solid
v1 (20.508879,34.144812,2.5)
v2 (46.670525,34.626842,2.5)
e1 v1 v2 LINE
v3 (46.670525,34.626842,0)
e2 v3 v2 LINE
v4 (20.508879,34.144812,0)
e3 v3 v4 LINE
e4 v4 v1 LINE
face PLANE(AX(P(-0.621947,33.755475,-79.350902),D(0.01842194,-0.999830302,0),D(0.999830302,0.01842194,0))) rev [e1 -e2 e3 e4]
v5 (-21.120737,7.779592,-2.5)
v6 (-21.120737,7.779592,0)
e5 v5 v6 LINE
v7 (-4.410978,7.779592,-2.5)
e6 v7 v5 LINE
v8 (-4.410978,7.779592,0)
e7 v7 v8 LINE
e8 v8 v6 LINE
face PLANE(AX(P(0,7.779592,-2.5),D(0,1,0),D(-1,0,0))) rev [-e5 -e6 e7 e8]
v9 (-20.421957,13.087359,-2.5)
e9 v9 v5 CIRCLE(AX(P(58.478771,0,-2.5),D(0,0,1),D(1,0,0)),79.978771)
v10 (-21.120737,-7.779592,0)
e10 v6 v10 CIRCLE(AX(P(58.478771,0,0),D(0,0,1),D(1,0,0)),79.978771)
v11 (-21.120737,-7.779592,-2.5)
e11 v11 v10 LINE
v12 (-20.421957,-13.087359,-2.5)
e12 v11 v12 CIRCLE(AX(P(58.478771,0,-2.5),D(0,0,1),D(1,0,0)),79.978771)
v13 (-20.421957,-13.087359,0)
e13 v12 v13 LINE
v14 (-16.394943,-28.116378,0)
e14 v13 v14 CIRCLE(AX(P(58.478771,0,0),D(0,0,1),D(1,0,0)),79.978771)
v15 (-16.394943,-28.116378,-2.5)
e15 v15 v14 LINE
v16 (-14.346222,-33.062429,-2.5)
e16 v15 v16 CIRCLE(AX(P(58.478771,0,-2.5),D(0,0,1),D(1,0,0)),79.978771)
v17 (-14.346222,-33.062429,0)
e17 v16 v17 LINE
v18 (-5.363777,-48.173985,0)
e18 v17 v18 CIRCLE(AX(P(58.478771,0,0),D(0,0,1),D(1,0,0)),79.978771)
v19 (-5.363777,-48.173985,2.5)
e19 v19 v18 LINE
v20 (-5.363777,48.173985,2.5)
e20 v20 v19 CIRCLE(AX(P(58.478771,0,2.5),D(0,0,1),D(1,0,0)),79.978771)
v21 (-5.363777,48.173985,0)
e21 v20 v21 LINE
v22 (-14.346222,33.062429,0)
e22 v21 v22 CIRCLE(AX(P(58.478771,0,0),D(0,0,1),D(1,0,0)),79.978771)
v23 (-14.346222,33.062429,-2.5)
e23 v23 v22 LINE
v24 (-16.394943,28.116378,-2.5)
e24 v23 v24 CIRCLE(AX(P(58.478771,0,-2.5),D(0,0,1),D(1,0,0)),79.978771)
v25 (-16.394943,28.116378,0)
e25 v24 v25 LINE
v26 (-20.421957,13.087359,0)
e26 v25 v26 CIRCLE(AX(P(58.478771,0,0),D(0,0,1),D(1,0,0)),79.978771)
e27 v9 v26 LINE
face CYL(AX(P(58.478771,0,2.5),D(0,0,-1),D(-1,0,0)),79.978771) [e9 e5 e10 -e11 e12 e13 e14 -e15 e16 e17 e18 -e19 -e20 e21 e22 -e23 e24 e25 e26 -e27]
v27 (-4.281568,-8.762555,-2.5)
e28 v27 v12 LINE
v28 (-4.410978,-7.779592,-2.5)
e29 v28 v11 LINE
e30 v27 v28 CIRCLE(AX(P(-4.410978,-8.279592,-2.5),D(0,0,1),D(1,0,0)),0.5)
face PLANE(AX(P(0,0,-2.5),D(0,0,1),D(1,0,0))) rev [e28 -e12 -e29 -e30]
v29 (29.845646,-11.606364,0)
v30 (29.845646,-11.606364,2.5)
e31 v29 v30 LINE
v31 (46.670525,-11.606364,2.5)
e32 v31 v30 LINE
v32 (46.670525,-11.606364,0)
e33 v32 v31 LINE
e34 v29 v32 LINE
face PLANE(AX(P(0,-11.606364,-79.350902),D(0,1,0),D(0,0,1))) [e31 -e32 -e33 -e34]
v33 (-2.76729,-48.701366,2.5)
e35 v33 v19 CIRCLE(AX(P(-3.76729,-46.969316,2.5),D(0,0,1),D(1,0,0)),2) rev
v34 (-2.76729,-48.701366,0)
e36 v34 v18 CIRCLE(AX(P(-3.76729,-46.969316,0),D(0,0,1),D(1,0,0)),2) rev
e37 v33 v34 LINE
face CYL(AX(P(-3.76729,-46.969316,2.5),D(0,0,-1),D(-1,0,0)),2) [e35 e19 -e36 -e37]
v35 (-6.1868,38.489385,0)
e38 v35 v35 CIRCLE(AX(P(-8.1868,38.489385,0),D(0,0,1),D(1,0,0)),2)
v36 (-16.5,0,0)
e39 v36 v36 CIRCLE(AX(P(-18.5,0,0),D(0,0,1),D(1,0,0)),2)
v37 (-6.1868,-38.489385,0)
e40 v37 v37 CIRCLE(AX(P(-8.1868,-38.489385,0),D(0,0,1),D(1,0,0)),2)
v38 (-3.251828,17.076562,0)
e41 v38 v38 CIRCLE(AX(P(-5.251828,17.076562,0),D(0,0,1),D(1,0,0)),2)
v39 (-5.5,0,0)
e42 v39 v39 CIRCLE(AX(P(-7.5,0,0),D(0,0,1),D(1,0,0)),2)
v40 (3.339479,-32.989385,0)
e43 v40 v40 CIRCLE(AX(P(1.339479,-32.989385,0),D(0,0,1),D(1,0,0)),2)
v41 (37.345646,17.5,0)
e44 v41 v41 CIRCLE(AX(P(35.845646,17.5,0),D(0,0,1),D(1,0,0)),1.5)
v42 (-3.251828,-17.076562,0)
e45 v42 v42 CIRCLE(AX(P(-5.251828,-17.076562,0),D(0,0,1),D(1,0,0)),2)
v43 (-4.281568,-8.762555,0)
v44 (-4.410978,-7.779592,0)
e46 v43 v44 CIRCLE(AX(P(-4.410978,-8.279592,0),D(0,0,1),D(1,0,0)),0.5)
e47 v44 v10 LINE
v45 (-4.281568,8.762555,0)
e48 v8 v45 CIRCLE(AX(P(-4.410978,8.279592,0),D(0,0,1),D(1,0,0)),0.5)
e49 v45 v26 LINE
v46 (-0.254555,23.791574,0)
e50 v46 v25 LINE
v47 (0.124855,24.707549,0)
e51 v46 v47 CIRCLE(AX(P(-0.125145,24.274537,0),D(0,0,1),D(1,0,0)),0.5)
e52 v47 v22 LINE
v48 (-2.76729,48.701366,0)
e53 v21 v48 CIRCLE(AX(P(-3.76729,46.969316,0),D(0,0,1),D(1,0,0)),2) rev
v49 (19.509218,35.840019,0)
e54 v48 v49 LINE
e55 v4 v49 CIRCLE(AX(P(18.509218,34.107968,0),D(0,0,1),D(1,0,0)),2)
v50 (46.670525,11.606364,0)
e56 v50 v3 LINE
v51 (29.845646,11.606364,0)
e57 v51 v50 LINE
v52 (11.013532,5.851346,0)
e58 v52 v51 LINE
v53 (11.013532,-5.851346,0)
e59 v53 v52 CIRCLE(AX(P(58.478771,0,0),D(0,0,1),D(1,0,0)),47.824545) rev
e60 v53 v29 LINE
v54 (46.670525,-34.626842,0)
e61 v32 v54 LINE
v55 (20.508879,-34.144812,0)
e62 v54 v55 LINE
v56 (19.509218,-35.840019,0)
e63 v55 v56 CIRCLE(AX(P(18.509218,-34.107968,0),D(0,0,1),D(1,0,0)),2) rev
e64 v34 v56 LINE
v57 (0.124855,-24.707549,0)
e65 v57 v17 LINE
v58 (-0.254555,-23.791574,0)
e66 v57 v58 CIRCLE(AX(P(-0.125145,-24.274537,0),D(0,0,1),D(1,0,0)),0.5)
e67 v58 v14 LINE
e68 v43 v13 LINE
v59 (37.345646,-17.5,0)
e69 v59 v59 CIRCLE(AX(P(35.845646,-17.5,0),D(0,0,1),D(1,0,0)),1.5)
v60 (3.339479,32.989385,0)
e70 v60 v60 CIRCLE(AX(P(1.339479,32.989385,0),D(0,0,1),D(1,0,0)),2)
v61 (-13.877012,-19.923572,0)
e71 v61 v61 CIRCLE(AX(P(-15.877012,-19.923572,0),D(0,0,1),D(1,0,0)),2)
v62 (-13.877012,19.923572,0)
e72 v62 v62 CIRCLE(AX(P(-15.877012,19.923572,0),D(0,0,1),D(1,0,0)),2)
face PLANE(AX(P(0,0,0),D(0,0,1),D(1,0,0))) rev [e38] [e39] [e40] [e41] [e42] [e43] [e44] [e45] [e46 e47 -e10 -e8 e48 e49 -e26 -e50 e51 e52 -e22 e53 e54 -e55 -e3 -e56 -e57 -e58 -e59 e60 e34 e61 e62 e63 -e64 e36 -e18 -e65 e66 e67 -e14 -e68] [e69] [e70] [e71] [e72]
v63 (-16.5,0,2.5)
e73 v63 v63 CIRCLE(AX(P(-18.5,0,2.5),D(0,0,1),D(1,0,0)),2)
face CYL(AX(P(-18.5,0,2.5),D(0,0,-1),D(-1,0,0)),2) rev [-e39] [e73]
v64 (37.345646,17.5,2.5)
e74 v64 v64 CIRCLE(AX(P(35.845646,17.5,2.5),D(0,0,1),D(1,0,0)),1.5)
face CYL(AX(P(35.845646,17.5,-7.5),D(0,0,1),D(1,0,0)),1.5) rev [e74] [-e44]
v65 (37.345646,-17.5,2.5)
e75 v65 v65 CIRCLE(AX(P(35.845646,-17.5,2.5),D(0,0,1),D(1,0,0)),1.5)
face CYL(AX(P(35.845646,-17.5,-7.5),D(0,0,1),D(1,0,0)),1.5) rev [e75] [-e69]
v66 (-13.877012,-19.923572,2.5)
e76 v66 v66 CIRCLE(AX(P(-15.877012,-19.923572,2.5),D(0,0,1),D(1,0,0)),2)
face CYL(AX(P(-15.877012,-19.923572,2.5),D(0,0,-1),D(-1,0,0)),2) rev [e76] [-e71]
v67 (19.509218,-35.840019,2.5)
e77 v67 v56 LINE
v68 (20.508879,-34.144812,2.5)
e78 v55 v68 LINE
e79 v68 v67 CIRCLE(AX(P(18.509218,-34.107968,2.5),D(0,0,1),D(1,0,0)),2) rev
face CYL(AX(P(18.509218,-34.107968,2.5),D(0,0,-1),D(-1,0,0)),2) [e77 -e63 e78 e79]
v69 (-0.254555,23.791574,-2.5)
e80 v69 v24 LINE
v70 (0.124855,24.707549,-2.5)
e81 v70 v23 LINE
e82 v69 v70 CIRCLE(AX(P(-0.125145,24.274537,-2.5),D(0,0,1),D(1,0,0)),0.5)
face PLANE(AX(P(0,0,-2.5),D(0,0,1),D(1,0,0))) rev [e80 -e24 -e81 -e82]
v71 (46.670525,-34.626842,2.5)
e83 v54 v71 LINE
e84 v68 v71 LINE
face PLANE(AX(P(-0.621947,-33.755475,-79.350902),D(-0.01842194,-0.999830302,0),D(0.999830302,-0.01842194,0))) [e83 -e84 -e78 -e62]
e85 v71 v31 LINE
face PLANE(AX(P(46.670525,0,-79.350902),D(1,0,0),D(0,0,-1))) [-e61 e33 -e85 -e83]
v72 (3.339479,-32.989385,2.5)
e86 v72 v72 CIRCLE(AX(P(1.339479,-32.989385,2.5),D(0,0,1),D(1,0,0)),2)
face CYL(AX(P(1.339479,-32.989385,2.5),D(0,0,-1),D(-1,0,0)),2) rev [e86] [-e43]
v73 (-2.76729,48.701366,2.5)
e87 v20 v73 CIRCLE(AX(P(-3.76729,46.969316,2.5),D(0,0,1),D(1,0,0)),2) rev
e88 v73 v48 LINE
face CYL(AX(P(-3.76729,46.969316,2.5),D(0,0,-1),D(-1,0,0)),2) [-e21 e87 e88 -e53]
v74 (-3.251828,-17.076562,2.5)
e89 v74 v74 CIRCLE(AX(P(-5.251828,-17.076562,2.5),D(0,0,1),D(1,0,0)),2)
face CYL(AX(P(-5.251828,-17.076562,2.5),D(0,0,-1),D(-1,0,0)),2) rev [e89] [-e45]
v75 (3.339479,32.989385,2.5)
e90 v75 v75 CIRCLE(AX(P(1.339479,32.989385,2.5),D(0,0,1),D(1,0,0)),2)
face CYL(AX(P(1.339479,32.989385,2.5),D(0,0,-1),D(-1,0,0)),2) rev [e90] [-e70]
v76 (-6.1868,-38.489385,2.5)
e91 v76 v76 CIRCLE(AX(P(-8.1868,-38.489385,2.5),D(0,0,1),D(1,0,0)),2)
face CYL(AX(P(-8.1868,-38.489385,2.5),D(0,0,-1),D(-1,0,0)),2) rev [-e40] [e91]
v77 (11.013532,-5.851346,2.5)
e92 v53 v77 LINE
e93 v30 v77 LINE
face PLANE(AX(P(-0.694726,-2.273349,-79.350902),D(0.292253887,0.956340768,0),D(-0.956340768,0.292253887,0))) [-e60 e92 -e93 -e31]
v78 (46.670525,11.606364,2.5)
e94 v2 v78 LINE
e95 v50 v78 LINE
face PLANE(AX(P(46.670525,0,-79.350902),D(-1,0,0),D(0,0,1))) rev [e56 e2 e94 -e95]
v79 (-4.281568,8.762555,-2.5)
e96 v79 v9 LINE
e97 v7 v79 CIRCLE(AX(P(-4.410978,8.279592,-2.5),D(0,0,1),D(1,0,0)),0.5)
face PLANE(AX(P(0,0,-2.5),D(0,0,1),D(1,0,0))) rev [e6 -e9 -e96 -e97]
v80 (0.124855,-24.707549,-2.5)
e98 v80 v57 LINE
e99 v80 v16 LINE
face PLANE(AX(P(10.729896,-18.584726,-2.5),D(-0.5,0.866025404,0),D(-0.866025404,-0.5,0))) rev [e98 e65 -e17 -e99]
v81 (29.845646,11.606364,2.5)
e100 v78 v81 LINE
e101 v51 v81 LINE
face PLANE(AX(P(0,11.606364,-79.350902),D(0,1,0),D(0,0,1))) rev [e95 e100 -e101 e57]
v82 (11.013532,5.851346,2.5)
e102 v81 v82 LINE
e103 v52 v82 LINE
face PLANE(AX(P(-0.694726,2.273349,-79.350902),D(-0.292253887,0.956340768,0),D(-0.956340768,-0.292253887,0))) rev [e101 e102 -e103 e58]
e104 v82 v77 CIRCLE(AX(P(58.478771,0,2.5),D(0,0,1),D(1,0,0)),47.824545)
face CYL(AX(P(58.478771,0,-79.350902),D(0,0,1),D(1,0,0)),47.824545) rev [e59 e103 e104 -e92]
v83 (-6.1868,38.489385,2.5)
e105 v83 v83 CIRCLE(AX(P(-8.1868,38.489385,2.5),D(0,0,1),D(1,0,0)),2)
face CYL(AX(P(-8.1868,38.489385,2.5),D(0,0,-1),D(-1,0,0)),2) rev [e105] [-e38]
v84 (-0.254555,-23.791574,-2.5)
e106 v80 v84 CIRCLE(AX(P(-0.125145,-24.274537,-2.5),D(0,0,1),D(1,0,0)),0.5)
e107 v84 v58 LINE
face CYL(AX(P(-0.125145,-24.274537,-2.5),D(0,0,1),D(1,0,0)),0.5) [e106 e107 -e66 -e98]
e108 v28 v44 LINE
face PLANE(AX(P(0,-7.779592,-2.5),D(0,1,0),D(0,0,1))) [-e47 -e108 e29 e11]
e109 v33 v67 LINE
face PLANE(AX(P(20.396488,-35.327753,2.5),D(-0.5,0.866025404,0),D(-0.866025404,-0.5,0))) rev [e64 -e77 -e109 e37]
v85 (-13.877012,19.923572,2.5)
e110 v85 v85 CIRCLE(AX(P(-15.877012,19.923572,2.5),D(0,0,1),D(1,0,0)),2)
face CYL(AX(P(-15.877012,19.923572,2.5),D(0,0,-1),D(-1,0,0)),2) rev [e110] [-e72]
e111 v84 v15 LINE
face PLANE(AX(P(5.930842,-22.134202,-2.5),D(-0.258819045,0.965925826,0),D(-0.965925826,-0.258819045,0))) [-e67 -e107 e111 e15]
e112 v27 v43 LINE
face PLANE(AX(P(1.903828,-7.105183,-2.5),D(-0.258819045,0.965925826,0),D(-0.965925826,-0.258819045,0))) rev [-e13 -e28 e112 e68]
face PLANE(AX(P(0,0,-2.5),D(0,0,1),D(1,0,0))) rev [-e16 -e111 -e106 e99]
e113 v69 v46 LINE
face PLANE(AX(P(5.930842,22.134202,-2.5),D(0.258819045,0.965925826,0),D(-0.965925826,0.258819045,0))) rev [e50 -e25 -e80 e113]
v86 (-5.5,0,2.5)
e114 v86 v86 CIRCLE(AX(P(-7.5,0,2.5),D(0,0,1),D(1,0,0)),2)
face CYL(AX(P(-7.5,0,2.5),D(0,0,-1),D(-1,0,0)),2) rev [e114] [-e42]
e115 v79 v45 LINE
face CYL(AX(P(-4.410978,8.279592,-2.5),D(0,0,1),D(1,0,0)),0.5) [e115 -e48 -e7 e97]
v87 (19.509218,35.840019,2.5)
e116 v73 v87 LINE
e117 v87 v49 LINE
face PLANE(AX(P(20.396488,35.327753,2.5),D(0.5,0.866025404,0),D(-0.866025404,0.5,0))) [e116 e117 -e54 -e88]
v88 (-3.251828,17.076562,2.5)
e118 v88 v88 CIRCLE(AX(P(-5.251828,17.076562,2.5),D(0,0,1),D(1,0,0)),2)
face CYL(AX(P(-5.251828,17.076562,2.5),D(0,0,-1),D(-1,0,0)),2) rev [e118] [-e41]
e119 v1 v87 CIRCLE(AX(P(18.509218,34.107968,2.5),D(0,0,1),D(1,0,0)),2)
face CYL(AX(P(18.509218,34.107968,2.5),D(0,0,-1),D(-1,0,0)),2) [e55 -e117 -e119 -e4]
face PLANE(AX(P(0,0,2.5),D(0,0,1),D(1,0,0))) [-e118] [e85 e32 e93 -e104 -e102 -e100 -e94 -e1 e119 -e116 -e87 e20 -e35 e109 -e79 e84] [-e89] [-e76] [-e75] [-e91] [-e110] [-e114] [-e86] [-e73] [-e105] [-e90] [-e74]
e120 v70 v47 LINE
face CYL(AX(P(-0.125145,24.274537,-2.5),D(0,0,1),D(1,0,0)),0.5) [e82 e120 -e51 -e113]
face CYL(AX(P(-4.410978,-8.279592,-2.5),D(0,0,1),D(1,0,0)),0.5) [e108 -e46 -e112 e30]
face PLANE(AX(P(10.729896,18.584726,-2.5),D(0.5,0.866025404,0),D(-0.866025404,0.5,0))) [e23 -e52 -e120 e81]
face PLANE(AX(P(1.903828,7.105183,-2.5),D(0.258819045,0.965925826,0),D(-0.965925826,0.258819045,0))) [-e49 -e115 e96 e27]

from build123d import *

# Parameters (mm, degrees)
CROQUIS1_R              = 2
SALIENTE_EXTRUIR1_DEPTH = 2.5
SALIENTE_EXTRUIR2_START = -2.5
SALIENTE_EXTRUIR2_DEPTH = 2.5
SALIENTE_EXTRUIR3_START = -2.5
SALIENTE_EXTRUIR3_DEPTH = 2.5
CROQUIS3_R              = 1.5
CORTAR_EXTRUIR1_DEPTH   = 10


# Read off the part's stored shape, not the designer's step: Saliente-Extruir2
with BuildPart() as part:
    # Croquis1 → Saliente-Extruir1 (new body)
    # profile 1 of 5: a face of its own
    with BuildSketch(Plane.XY):
        with BuildLine():
            Line((-21.120737491, -7.779592428), (-4.410977671, -7.779592428))
            ThreePointArc((-4.410977671, -7.779592428), (-3.91525524, -8.214329332), (-4.281568148, -8.762555341))
            Line((-4.281568148, -8.762555341), (-20.42195671, -13.087359421))
            ThreePointArc((-20.42195671, -13.087359421), (-18.774789479, -20.700029026), (-16.394943343, -28.116377909))
            Line((-16.394943343, -28.116377909), (-0.254554781, -23.791573829))
            ThreePointArc((-0.254554781, -23.791573829), (0.336794507, -24.083195026), (0.124854741, -24.707549444))
            Line((0.124854741, -24.707549444), (-14.346221754, -33.062429354))
            ThreePointArc((-14.346221754, -33.062429354), (-10.27145788, -40.865753752), (-5.363777272, -48.173984957))
            ThreePointArc((-5.363777272, -48.173984957), (-4.165388027, -48.929294708), (-2.76728992, -48.70136646))
            Line((-2.76728992, -48.70136646), (19.509218146, -35.840018532))
            ThreePointArc((19.509218146, -35.840018532), (20.480258523, -34.447083978), (20.030579853, -32.809715608))
            ThreePointArc((20.030579853, -32.809715608), (7.934326683, 0), (20.030579853, 32.809715608))
            ThreePointArc((20.030579853, 32.809715608), (20.480258523, 34.447083978), (19.509218146, 35.840018532))
            Line((19.509218146, 35.840018532), (-2.76728992, 48.70136646))
            ThreePointArc((-2.76728992, 48.70136646), (-4.165388027, 48.929294708), (-5.363777272, 48.173984957))
            ThreePointArc((-5.363777272, 48.173984957), (-10.27145788, 40.865753752), (-14.346221754, 33.062429354))
            Line((-14.346221754, 33.062429354), (0.124854741, 24.707549444))
            ThreePointArc((0.124854741, 24.707549444), (0.336794507, 24.083195026), (-0.254554781, 23.791573829))
            Line((-0.254554781, 23.791573829), (-16.394943343, 28.116377909))
            ThreePointArc((-16.394943343, 28.116377909), (-18.774789479, 20.700029026), (-20.42195671, 13.087359421))
            Line((-20.42195671, 13.087359421), (-4.281568148, 8.762555341))
            ThreePointArc((-4.281568148, 8.762555341), (-3.91525524, 8.214329332), (-4.410977671, 7.779592428))
            Line((-4.410977671, 7.779592428), (-21.120737491, 7.779592428))
            ThreePointArc((-21.120737491, 7.779592428), (-21.5, 0), (-21.120737491, -7.779592428))
        make_face()
        with Locations((-8.186800297, -38.489385282)):
            Circle(CROQUIS1_R, mode=Mode.SUBTRACT)
        with Locations((-15.877012, -19.92357189)):
            Circle(CROQUIS1_R, mode=Mode.SUBTRACT)
        with Locations((-5.251827911, -17.076562394)):
            Circle(CROQUIS1_R, mode=Mode.SUBTRACT)
        with Locations((1.339479145, -32.989385282)):
            Circle(CROQUIS1_R, mode=Mode.SUBTRACT)
        with Locations((-18.5, 0)):
            Circle(CROQUIS1_R, mode=Mode.SUBTRACT)
        with Locations((-15.877012, 19.92357189)):
            Circle(CROQUIS1_R, mode=Mode.SUBTRACT)
        with Locations((-7.5, 0)):
            Circle(CROQUIS1_R, mode=Mode.SUBTRACT)
        with Locations((-5.251827911, 17.076562394)):
            Circle(CROQUIS1_R, mode=Mode.SUBTRACT)
        with Locations((-8.186800297, 38.489385282)):
            Circle(CROQUIS1_R, mode=Mode.SUBTRACT)
        with Locations((1.339479145, 32.989385282)):
            Circle(CROQUIS1_R, mode=Mode.SUBTRACT)
    # profile 2 of 5: a face of its own
    with BuildSketch(Plane.XY):
        with BuildLine():
            ThreePointArc((-14.346221754, 33.062429354), (-15.411978596, 30.606550436), (-16.394943343, 28.116377909))
            Line((-16.394943343, 28.116377909), (-0.254554781, 23.791573829))
            ThreePointArc((-0.254554781, 23.791573829), (0.336794507, 24.083195026), (0.124854741, 24.707549444))
            Line((0.124854741, 24.707549444), (-14.346221754, 33.062429354))
        make_face()
    # profile 3 of 5: a face of its own
    with BuildSketch(Plane.XY):
        with BuildLine():
            ThreePointArc((-20.42195671, 13.087359421), (-20.815770531, 10.43932438), (-21.120737491, 7.779592428))
            Line((-21.120737491, 7.779592428), (-4.410977671, 7.779592428))
            ThreePointArc((-4.410977671, 7.779592428), (-3.91525524, 8.214329332), (-4.281568148, 8.762555341))
            Line((-4.281568148, 8.762555341), (-20.42195671, 13.087359421))
        make_face()
    # profile 4 of 5: a face of its own
    with BuildSketch(Plane.XY):
        with BuildLine():
            ThreePointArc((-4.281568148, -8.762555341), (-3.91525524, -8.214329332), (-4.410977671, -7.779592428))
            Line((-4.410977671, -7.779592428), (-21.120737491, -7.779592428))
            ThreePointArc((-21.120737491, -7.779592428), (-20.815770531, -10.43932438), (-20.42195671, -13.087359421))
            Line((-20.42195671, -13.087359421), (-4.281568148, -8.762555341))
        make_face()
    # profile 5 of 5: a face of its own
    with BuildSketch(Plane.XY):
        with BuildLine():
            Line((-0.254554781, -23.791573829), (-16.394943343, -28.116377909))
            ThreePointArc((-16.394943343, -28.116377909), (-15.411978596, -30.606550436), (-14.346221754, -33.062429354))
            Line((-14.346221754, -33.062429354), (0.124854741, -24.707549444))
            ThreePointArc((0.124854741, -24.707549444), (0.336794507, -24.083195026), (-0.254554781, -23.791573829))
        make_face()
    extrude(amount=SALIENTE_EXTRUIR1_DEPTH)

    # Saliente-Extruir2 outline → Saliente-Extruir2 (add)
    with BuildSketch(Plane.XY.offset(SALIENTE_EXTRUIR2_START)):
        with BuildLine():
            Line((-0.254554781, -23.791573829), (-16.394943343, -28.116377909))
            ThreePointArc((-16.394943343, -28.116377909), (-15.411978595, -30.606550436), (-14.346221754, -33.062429354))
            Line((-14.346221754, -33.062429354), (0.124854741, -24.707549444))
            ThreePointArc((0.124854741, -24.707549444), (0.336794507, -24.083195026), (-0.254554781, -23.791573829))
        make_face()
        with BuildLine():
            Line((-4.410977671, -7.779592428), (-21.120737491, -7.779592428))
            ThreePointArc((-21.120737491, -7.779592428), (-20.815770531, -10.43932438), (-20.42195671, -13.087359421))
            Line((-20.42195671, -13.087359421), (-4.281568148, -8.762555341))
            ThreePointArc((-4.281568148, -8.762555341), (-3.91525524, -8.214329332), (-4.410977671, -7.779592428))
        make_face()
        with BuildLine():
            Line((-4.281568148, 8.762555341), (-20.42195671, 13.087359421))
            ThreePointArc((-20.42195671, 13.087359421), (-20.815770531, 10.43932438), (-21.120737491, 7.779592428))
            Line((-21.120737491, 7.779592428), (-4.410977671, 7.779592428))
            ThreePointArc((-4.410977671, 7.779592428), (-3.91525524, 8.214329332), (-4.281568148, 8.762555341))
        make_face()
        with BuildLine():
            Line((-16.394943343, 28.116377909), (-0.254554781, 23.791573829))
            ThreePointArc((-0.254554781, 23.791573829), (0.336794507, 24.083195026), (0.124854741, 24.707549444))
            Line((0.124854741, 24.707549444), (-14.346221754, 33.062429354))
            ThreePointArc((-14.346221754, 33.062429354), (-15.411978595, 30.606550436), (-16.394943343, 28.116377909))
        make_face()
    extrude(amount=SALIENTE_EXTRUIR2_DEPTH)

    # Croquis2 → Saliente-Extruir3 (add)
    with BuildSketch(Plane.XY.offset(2.5).offset(SALIENTE_EXTRUIR3_START)):
        with BuildLine():
            ThreePointArc((20.030579853, 32.809715608), (11.054709029, 17.484255625), (7.934326683, 0))
            Line((7.934326683, 0), (10.654225828, 0))
            ThreePointArc((10.654225828, 0), (10.744136996, 2.931183608), (11.013532431, 5.85134584))
            Line((11.013532431, 5.85134584), (29.845645811, 11.606363843))
            Line((29.845645811, 11.606363843), (46.670524679, 11.606363843))
            Line((46.670524679, 11.606363843), (46.670524679, 34.626841689))
            Line((46.670524679, 34.626841689), (20.50887875, 34.144811605))
            ThreePointArc((20.50887875, 34.144811605), (20.392040458, 33.433445566), (20.030579853, 32.809715608))
        make_face()
        with BuildLine():
            Line((10.654225828, 0), (7.934326683, 0))
            ThreePointArc((7.934326683, 0), (11.054709029, -17.484255625), (20.030579853, -32.809715608))
            ThreePointArc((20.030579853, -32.809715608), (20.392040458, -33.433445566), (20.50887875, -34.144811605))
            Line((20.50887875, -34.144811605), (46.670524679, -34.626841689))
            Line((46.670524679, -34.626841689), (46.670524679, -11.606363843))
            Line((46.670524679, -11.606363843), (29.845645811, -11.606363843))
            Line((29.845645811, -11.606363843), (11.013532431, -5.85134584))
            ThreePointArc((11.013532431, -5.85134584), (10.744136996, -2.931183608), (10.654225828, 0))
        make_face()
    extrude(amount=SALIENTE_EXTRUIR3_DEPTH)

    # Croquis3 → Cortar-Extruir1 (cut)
    with BuildSketch(Plane.XY.offset(2.5)):
        with Locations((35.845645811, -17.5)):
            Circle(CROQUIS3_R)
        with Locations((35.845645811, 17.5)):
            Circle(CROQUIS3_R)
    extrude(amount=-CORTAR_EXTRUIR1_DEPTH, mode=Mode.SUBTRACT)


solid = part.part
